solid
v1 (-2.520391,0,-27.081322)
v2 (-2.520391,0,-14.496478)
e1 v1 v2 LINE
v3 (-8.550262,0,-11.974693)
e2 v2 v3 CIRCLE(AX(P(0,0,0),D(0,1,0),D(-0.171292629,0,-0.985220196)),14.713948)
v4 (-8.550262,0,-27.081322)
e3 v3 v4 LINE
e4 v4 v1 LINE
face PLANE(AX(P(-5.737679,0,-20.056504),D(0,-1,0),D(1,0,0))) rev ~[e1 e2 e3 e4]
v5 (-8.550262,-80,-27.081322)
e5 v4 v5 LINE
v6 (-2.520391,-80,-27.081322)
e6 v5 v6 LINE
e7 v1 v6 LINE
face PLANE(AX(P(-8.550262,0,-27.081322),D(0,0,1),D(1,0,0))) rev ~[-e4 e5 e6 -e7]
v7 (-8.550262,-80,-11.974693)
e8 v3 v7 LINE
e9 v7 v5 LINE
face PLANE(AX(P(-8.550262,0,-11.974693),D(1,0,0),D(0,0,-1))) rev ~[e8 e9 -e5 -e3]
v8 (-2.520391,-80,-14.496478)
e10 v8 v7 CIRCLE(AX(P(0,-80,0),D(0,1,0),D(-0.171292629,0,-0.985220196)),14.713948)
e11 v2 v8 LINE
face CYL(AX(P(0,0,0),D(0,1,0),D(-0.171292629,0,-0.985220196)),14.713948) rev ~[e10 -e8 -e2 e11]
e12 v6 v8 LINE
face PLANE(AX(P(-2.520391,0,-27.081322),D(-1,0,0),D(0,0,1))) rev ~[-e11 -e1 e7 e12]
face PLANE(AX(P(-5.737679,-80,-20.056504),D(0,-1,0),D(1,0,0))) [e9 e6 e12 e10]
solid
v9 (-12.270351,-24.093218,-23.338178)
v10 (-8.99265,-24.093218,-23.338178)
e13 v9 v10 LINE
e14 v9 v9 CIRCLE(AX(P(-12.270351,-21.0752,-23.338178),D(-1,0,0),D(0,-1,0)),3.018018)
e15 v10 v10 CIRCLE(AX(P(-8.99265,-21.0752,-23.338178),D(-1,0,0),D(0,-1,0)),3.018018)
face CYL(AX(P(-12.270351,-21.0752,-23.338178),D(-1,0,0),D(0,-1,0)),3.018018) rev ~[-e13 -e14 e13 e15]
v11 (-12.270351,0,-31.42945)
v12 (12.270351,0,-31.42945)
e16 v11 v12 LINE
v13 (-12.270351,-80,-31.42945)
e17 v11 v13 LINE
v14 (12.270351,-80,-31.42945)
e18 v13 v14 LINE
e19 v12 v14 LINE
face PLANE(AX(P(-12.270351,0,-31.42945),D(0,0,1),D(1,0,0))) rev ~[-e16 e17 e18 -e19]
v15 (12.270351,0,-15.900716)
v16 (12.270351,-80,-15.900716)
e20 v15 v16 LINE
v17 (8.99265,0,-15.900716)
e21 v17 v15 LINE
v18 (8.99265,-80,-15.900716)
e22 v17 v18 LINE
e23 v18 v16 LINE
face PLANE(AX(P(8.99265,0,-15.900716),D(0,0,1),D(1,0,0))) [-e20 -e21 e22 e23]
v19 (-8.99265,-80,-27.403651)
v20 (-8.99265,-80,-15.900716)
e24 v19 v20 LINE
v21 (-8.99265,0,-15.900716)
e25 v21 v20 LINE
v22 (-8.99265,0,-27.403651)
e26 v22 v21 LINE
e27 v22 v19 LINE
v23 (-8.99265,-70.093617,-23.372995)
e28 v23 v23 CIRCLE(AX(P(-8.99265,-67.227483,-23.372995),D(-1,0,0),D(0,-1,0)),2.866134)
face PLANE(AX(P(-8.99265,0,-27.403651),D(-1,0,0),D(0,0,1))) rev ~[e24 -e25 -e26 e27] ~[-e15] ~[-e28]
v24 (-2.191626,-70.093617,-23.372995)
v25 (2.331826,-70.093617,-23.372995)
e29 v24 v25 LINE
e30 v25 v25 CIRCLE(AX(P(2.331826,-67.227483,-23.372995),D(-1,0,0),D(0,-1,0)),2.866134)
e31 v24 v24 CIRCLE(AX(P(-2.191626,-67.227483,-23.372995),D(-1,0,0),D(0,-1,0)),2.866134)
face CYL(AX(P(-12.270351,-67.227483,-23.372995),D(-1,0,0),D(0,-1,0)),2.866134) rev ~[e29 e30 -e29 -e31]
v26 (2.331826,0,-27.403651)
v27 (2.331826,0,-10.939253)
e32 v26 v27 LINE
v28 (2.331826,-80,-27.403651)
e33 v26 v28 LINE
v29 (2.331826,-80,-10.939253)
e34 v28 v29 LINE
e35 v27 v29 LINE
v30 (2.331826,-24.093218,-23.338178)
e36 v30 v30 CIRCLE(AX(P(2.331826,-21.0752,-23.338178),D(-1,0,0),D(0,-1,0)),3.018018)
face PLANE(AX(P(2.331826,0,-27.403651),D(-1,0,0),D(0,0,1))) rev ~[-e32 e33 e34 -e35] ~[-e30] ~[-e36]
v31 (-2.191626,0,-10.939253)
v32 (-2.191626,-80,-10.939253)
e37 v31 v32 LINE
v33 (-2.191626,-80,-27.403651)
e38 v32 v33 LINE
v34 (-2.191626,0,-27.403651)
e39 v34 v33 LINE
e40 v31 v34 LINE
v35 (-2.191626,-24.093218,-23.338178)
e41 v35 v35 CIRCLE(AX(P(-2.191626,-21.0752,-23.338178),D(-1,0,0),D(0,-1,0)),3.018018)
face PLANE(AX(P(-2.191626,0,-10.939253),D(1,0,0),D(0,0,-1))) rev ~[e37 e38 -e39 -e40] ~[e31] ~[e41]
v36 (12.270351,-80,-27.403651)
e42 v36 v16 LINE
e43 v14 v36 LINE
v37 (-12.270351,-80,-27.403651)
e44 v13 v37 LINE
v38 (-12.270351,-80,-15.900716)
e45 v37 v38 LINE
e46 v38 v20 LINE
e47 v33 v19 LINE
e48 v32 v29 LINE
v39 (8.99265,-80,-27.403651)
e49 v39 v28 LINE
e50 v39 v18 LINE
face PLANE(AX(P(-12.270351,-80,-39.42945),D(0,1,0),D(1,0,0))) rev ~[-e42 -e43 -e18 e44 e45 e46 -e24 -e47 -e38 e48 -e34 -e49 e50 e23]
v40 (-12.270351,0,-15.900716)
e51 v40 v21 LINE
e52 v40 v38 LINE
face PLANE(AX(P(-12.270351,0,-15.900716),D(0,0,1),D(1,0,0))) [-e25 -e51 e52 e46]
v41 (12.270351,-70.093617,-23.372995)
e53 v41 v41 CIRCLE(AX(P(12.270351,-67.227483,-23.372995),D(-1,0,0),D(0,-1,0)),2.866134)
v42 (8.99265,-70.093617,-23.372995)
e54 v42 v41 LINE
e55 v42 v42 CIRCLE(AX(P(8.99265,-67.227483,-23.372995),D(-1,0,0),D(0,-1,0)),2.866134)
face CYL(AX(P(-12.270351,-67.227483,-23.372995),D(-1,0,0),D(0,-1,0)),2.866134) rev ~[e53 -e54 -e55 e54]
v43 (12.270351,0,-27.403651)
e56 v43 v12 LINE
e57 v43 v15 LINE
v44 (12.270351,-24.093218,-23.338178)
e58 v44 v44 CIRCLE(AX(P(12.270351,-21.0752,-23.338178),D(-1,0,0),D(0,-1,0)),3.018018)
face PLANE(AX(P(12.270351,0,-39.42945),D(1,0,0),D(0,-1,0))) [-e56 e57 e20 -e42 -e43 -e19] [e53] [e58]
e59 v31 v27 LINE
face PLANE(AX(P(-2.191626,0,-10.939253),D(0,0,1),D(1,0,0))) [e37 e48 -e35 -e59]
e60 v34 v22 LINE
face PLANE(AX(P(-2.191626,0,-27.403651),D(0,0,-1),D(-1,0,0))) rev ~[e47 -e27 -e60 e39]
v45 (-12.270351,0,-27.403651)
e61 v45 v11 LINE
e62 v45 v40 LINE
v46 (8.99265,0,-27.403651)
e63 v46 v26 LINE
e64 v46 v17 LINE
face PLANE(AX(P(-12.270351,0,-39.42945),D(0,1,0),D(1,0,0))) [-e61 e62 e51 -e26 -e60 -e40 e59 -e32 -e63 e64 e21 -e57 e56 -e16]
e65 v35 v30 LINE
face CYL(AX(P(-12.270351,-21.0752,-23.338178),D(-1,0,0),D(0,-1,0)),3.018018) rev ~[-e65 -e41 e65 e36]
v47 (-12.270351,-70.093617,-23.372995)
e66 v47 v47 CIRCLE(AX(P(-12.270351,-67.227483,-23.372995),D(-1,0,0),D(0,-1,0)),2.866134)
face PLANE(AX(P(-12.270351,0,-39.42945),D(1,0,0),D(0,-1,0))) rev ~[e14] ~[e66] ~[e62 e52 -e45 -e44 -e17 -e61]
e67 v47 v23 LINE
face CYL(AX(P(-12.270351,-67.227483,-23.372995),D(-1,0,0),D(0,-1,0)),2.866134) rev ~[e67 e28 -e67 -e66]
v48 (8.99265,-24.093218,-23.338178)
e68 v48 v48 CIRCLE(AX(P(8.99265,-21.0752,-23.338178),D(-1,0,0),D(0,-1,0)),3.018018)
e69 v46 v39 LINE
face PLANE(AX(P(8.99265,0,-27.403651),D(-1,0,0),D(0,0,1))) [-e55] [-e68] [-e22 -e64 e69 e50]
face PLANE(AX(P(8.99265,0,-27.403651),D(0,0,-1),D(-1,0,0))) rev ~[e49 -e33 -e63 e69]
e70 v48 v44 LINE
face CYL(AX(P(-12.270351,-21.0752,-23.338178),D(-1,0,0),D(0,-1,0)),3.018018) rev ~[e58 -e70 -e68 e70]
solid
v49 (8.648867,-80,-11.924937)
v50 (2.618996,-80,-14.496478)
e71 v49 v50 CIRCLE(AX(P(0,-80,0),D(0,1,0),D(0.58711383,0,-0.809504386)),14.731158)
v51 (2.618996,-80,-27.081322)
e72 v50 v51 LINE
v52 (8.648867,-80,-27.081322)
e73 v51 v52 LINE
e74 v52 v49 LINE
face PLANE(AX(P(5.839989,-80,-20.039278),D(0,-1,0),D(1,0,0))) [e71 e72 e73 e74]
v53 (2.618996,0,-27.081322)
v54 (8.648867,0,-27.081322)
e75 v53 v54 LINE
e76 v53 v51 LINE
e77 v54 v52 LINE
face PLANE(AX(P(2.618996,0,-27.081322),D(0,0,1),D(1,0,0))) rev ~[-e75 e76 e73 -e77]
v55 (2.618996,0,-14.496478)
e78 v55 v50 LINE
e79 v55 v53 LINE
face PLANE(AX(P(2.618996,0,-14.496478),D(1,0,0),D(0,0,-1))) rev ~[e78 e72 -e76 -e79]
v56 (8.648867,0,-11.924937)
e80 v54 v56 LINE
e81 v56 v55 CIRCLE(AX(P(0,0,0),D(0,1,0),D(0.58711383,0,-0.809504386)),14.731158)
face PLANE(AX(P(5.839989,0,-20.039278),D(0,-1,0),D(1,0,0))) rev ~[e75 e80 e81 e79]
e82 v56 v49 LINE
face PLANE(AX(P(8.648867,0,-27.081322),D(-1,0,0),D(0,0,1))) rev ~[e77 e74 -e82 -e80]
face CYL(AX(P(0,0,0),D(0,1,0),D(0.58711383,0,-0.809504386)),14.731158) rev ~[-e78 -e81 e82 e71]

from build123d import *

# Parameters (mm, degrees)
F1_W     = 3.2777013257
F1_H     = 11.5029346198
F1_W_2   = 4.52345144
F1_H_2   = 4.1451063007
F1_H_3   = 16.4643982425
F2_DEPTH = 80
F5_R     = 3.0180179705
F5_R_2   = 2.8661340768
F6_DEPTH = 77
F7_DEPTH = 9
F8_DEPTH = 8


with BuildPart() as f2:
    # F1 (on Front) → F2 (new body)
    with BuildSketch(Plane.XZ):
        with Locations((10.6315002777, -21.6521834955)):
            Rectangle(F1_W, F1_H)
        with Locations((-10.6315002777, -21.6521834955)):
            Rectangle(F1_W, F1_H)
        with Locations((0.0701001845, -29.4762039557)):
            Rectangle(F1_W_2, F1_H_2)
        with Locations((0.0701001845, -19.1714516841)):
            Rectangle(F1_W_2, F1_H_3)
        Polygon((-2.1916255355, -31.5487571061), (-2.1916255355, -27.4036508054), (-8.9926496148, -27.4036508054), (-12.2703509405, -27.4036508054), (-12.2703509405, -39.4294504076), (12.2703509405, -39.4294504076), (12.2703509405, -27.4036508054), (8.9926496148, -27.4036508054), (2.3318259045, -27.4036508054), (2.3318259045, -31.5487571061), align=None)
    extrude(amount=F2_DEPTH)

    # F5 (on face) → F6 (cut)
    with BuildSketch(Plane(origin=(-12.2703509405, 0, 0), x_dir=(0, -1, 0), z_dir=(-1, 0, 0))):
        with Locations((21.0752002895, -23.3381781727)):
            Circle(F5_R)
        with Locations((67.2274827957, -23.3729947358)):
            Circle(F5_R_2)
    extrude(amount=-F6_DEPTH, mode=Mode.SUBTRACT)

    # F7 (add): a face of the model
    f7_faces = [f2.faces().sort_by_distance(p)[0] for p in [
        (0, -40, -39.4294504076),
    ]]
    extrude(f7_faces, amount=-F7_DEPTH)

    # F8 (cut): a face of the model
    f8_faces = [f2.faces().sort_by_distance(p)[0] for p in [
        (0, -40, -39.4294504076),
    ]]
    extrude(f8_faces, amount=-F8_DEPTH, mode=Mode.SUBTRACT)


with BuildPart() as f2b:
    # F0 (on Front) → F2, piece 2 (new body)
    with BuildSketch(Plane.XZ):
        with BuildLine():
            Line((8.6488667876, -27.0813219249), (8.6488667876, -11.9249372814))
            ThreePointArc((8.6488667876, -11.9249372814), (5.7787876042, -13.5503741535), (2.6189955003, -14.4964784842))
            Line((2.6189955003, -14.4964784842), (2.6189955003, -27.0813219249))
            Line((2.6189955003, -27.0813219249), (8.6488667876, -27.0813219249))
        make_face()
    extrude(amount=F2_DEPTH)


with BuildPart() as f2c:
    # F0 (on Front) → F2, piece 3 (new body)
    with BuildSketch(Plane.XZ):
        with BuildLine():
            ThreePointArc((-2.5203907914, -14.4964784842), (-5.6771197832, -13.5746296138), (-8.5502620786, -11.9746931723))
            Line((-8.5502620786, -11.9746931723), (-8.5502620786, -27.0813219249))
            Line((-8.5502620786, -27.0813219249), (-2.5203907914, -27.0813219249))
            Line((-2.5203907914, -27.0813219249), (-2.5203907914, -14.4964784842))
        make_face()
    extrude(amount=F2_DEPTH)


solid = Compound([f2.part, f2b.part, f2c.part])
